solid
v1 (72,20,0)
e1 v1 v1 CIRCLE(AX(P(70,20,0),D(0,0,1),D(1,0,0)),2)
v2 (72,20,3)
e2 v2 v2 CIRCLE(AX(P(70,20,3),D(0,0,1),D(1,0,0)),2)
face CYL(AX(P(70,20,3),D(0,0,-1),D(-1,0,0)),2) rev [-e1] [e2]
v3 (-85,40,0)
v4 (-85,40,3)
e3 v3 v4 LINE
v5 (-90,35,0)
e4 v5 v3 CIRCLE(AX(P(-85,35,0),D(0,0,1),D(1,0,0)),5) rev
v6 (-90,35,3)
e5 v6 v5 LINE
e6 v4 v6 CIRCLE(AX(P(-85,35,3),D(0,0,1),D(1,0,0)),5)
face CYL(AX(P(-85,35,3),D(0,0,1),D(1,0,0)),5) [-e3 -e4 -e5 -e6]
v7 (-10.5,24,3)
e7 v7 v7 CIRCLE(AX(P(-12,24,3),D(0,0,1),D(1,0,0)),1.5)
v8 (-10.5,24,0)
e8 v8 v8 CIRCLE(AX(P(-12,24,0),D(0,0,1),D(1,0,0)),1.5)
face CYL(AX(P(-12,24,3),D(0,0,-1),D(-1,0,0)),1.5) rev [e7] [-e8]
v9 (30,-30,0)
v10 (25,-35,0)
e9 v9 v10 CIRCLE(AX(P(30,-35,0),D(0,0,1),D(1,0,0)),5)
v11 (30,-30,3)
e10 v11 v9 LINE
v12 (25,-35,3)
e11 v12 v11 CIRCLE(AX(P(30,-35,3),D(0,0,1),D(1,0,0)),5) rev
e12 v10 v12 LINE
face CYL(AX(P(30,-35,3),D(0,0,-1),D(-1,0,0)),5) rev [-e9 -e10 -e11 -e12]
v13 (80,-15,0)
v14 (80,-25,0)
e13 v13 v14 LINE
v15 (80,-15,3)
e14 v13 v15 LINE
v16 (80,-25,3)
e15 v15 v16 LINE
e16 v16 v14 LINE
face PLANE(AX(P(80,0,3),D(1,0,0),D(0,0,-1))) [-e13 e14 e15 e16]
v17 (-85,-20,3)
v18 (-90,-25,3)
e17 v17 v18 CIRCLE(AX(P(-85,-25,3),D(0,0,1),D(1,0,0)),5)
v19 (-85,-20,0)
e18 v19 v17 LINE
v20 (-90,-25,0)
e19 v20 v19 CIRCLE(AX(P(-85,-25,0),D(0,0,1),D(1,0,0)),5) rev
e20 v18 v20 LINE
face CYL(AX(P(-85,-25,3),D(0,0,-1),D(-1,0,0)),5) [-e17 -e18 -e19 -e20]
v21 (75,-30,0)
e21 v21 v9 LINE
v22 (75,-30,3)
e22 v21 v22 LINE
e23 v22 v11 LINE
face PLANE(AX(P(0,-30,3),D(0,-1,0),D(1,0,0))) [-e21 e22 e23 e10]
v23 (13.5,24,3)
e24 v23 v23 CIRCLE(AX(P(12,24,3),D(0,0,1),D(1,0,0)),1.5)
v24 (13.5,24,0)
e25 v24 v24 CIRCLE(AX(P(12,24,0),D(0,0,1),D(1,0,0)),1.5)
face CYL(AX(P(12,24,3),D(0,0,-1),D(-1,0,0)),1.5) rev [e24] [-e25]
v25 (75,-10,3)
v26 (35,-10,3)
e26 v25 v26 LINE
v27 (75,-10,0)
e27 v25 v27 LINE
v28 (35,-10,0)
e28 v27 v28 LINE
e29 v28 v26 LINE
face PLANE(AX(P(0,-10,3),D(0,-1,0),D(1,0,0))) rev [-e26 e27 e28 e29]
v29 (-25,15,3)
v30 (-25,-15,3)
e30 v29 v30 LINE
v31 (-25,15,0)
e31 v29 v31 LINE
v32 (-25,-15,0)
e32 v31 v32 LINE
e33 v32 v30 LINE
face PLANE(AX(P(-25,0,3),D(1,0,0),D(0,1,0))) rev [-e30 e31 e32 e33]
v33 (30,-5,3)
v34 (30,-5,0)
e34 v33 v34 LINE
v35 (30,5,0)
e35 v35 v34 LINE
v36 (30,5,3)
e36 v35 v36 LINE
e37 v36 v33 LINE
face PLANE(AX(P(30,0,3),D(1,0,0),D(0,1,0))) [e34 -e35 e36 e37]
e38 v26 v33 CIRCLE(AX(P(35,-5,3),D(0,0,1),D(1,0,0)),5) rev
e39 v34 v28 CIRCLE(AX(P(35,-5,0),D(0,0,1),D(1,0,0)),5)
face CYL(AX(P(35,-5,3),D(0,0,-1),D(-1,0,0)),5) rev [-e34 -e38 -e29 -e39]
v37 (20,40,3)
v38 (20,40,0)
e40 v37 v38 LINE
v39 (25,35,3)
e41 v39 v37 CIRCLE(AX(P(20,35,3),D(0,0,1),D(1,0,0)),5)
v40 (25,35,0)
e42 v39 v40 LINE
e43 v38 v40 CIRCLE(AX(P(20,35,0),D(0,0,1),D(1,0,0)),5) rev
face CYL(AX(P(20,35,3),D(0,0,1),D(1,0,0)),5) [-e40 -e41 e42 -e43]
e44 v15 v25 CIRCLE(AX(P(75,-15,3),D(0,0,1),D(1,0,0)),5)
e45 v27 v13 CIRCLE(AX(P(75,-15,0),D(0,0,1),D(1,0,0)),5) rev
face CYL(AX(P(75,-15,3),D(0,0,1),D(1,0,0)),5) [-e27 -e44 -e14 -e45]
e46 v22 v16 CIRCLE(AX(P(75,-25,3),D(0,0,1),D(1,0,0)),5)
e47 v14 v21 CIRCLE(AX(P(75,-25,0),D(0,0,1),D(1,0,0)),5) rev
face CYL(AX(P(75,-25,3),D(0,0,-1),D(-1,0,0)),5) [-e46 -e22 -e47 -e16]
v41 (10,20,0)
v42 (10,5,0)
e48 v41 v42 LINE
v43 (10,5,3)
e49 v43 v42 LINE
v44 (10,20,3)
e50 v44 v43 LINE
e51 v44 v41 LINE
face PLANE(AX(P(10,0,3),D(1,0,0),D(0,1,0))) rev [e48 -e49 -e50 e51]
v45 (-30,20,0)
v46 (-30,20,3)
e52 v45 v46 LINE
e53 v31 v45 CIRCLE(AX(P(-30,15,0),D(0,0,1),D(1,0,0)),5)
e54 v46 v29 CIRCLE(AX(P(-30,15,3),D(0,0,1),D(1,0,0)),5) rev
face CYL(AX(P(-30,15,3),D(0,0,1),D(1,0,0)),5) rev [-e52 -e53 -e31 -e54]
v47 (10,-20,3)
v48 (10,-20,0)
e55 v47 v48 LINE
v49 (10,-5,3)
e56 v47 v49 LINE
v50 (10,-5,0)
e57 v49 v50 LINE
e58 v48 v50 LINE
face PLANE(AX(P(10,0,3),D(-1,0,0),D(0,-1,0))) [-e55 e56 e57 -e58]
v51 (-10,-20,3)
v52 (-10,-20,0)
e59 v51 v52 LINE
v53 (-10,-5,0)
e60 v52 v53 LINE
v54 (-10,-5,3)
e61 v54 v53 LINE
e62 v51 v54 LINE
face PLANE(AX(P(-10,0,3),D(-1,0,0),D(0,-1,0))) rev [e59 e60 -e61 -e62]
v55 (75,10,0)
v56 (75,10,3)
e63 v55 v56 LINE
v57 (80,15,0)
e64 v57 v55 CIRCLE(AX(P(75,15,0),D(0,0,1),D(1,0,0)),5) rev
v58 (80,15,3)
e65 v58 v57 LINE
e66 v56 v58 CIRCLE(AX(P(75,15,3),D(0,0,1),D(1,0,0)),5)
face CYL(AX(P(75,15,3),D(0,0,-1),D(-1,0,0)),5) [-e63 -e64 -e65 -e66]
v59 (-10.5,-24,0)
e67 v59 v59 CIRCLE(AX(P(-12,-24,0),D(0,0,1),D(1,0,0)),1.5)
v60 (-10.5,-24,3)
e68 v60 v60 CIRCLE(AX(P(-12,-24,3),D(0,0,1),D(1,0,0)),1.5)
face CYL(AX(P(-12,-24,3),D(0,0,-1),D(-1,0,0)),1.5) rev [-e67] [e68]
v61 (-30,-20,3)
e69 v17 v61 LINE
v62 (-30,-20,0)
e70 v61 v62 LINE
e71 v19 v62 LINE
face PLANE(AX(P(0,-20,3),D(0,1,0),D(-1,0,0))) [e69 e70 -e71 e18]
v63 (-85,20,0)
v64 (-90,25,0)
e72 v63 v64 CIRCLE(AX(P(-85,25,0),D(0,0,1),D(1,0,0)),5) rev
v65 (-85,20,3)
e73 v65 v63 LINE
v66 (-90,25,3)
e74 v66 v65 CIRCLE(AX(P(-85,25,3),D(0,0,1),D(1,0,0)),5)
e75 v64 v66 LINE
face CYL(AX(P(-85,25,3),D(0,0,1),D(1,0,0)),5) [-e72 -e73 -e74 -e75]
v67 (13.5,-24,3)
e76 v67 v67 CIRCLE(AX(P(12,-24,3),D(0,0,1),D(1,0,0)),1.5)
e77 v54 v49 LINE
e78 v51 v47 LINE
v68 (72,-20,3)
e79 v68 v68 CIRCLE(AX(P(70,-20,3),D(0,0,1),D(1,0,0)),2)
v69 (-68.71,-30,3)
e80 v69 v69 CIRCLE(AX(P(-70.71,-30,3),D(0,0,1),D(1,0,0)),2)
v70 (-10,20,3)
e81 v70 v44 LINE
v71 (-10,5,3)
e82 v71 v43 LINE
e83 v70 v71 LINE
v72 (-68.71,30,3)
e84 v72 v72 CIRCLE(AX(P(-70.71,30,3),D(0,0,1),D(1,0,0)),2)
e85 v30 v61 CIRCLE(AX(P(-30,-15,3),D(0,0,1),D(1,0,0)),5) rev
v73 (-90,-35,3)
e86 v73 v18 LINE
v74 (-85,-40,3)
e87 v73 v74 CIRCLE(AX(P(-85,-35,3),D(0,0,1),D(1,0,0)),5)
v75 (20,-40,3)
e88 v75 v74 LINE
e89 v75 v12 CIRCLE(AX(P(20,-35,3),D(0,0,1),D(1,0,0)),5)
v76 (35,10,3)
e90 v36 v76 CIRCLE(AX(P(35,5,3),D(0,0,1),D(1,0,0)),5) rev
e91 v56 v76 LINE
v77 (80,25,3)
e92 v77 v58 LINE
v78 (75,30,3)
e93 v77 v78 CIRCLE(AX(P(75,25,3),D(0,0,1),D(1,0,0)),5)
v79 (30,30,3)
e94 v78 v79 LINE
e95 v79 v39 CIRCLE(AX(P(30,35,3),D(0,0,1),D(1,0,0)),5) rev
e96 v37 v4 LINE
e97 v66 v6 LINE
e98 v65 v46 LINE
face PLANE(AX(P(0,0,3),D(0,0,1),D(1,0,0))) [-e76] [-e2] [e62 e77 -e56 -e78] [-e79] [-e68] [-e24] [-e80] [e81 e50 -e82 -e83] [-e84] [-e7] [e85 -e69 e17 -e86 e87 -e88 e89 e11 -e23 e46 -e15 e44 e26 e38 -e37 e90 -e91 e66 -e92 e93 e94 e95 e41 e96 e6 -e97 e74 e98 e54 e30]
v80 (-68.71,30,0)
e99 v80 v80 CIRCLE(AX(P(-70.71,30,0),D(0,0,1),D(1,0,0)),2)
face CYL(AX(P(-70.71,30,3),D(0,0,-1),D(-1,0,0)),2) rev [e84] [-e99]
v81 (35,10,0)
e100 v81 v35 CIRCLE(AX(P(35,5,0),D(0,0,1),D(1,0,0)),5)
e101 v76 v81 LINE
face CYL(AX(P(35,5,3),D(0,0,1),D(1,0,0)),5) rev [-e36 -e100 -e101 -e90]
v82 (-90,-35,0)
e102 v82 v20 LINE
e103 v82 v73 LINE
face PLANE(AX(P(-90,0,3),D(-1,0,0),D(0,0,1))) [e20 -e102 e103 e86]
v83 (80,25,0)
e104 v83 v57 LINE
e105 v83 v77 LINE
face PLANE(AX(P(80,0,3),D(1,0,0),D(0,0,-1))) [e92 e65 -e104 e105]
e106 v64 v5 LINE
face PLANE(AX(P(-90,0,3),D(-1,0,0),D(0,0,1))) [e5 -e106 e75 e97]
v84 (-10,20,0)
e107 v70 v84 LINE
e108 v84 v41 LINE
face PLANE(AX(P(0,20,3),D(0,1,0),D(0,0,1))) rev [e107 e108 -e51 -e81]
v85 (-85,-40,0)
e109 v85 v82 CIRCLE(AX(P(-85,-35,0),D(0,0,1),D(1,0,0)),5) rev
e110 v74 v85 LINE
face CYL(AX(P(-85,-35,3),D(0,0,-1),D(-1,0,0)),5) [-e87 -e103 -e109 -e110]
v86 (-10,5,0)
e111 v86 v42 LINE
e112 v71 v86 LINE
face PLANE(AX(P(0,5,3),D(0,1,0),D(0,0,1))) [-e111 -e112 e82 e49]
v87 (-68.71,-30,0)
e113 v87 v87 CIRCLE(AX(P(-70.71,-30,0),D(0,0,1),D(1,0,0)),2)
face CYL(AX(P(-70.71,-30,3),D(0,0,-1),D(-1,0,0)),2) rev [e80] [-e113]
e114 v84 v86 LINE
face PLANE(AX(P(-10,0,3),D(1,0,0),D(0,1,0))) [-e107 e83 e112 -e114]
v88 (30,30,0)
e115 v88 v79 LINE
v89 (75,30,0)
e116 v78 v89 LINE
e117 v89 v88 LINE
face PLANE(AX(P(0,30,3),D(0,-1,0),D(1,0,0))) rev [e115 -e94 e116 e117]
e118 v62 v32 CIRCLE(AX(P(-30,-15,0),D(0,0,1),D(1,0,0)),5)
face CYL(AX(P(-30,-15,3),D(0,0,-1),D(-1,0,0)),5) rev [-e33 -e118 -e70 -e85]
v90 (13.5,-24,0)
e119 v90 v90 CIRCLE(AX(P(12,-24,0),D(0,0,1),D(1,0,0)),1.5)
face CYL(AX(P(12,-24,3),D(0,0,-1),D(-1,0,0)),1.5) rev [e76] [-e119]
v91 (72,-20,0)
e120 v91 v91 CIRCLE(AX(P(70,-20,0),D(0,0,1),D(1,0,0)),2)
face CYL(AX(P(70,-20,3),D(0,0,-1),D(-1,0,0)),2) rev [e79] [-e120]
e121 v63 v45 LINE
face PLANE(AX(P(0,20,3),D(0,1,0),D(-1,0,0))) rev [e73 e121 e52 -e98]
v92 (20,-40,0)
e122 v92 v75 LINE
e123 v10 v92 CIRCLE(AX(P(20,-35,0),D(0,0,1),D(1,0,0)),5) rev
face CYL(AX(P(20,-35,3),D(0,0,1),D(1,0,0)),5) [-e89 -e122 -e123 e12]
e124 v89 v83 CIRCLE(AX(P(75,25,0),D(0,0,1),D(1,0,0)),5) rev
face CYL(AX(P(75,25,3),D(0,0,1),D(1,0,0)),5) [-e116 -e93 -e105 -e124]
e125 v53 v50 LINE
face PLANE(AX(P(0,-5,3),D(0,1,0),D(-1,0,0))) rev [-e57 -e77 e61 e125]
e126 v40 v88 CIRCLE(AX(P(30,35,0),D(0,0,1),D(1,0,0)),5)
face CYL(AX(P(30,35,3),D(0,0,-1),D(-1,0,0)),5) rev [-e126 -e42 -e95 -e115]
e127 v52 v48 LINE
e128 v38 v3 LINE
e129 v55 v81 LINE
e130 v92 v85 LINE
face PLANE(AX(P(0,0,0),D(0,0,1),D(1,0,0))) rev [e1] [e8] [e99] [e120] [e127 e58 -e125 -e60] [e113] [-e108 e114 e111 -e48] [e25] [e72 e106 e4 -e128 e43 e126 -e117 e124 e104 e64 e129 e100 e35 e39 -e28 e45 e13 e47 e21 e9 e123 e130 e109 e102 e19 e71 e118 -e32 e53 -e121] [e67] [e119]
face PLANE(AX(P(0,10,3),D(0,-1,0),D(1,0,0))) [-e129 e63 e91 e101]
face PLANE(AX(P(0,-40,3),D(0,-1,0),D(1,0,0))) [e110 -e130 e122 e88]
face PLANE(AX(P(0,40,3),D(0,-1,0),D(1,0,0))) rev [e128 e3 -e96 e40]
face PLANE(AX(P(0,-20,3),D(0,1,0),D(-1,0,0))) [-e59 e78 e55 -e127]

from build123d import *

# Parameters (mm, degrees)
CROQUIS18_R             = 2
CROQUIS18_R_2           = 1.5
CROQUIS18_W             = 20
CROQUIS18_H             = 15
SALIENTE_EXTRUIR1_DEPTH = 3
REDONDEO1_R             = 5


with BuildPart() as part:
    # Croquis18 → Saliente-Extruir1 (new body)
    with BuildSketch(Plane.XY):
        Polygon((-90, -40), (25, -40), (25, -30), (80, -30), (80, -10), (30, -10), (30, 10), (80, 10), (80, 30), (25, 30), (25, 40), (-90, 40), (-90, 20), (-25, 20), (-25, -20), (-90, -20), align=None)
        with Locations((-70.71, -30)):
            Circle(CROQUIS18_R, mode=Mode.SUBTRACT)
        with Locations((-12, -24)):
            Circle(CROQUIS18_R_2, mode=Mode.SUBTRACT)
        with Locations((12, -24)):
            Circle(CROQUIS18_R_2, mode=Mode.SUBTRACT)
        with Locations((70, -20)):
            Circle(CROQUIS18_R, mode=Mode.SUBTRACT)
        with Locations((0, -12.5)):
            Rectangle(CROQUIS18_W, CROQUIS18_H, mode=Mode.SUBTRACT)
        with Locations((-70.71, 30)):
            Circle(CROQUIS18_R, mode=Mode.SUBTRACT)
        with Locations((-12, 24)):
            Circle(CROQUIS18_R_2, mode=Mode.SUBTRACT)
        with Locations((0, 12.5)):
            Rectangle(CROQUIS18_W, CROQUIS18_H, mode=Mode.SUBTRACT)
        with Locations((70, 20)):
            Circle(CROQUIS18_R, mode=Mode.SUBTRACT)
        with Locations((12, 24)):
            Circle(CROQUIS18_R_2, mode=Mode.SUBTRACT)
    extrude(amount=SALIENTE_EXTRUIR1_DEPTH)

    # Redondeo1
    redondeo1_edges = [part.edges().sort_by_distance(p)[0] for p in [
        (25, -40, 1.5),
        (25, -30, 1.5),
        (25, 40, 1.5),
        (25, 30, 1.5),
        (-25, -20, 1.5),
        (-25, 20, 1.5),
        (-90, -40, 1.5),
        (-90, -20, 1.5),
        (-90, 20, 1.5),
        (-90, 40, 1.5),
        (80, 30, 1.5),
        (80, -30, 1.5),
        (30, -10, 1.5),
        (30, 10, 1.5),
        (80, -10, 1.5),
        (80, 10, 1.5),
    ]]
    fillet(redondeo1_edges, radius=REDONDEO1_R - 0.0001)  # a hair under: the kernel refuses the full size


solid = part.part
